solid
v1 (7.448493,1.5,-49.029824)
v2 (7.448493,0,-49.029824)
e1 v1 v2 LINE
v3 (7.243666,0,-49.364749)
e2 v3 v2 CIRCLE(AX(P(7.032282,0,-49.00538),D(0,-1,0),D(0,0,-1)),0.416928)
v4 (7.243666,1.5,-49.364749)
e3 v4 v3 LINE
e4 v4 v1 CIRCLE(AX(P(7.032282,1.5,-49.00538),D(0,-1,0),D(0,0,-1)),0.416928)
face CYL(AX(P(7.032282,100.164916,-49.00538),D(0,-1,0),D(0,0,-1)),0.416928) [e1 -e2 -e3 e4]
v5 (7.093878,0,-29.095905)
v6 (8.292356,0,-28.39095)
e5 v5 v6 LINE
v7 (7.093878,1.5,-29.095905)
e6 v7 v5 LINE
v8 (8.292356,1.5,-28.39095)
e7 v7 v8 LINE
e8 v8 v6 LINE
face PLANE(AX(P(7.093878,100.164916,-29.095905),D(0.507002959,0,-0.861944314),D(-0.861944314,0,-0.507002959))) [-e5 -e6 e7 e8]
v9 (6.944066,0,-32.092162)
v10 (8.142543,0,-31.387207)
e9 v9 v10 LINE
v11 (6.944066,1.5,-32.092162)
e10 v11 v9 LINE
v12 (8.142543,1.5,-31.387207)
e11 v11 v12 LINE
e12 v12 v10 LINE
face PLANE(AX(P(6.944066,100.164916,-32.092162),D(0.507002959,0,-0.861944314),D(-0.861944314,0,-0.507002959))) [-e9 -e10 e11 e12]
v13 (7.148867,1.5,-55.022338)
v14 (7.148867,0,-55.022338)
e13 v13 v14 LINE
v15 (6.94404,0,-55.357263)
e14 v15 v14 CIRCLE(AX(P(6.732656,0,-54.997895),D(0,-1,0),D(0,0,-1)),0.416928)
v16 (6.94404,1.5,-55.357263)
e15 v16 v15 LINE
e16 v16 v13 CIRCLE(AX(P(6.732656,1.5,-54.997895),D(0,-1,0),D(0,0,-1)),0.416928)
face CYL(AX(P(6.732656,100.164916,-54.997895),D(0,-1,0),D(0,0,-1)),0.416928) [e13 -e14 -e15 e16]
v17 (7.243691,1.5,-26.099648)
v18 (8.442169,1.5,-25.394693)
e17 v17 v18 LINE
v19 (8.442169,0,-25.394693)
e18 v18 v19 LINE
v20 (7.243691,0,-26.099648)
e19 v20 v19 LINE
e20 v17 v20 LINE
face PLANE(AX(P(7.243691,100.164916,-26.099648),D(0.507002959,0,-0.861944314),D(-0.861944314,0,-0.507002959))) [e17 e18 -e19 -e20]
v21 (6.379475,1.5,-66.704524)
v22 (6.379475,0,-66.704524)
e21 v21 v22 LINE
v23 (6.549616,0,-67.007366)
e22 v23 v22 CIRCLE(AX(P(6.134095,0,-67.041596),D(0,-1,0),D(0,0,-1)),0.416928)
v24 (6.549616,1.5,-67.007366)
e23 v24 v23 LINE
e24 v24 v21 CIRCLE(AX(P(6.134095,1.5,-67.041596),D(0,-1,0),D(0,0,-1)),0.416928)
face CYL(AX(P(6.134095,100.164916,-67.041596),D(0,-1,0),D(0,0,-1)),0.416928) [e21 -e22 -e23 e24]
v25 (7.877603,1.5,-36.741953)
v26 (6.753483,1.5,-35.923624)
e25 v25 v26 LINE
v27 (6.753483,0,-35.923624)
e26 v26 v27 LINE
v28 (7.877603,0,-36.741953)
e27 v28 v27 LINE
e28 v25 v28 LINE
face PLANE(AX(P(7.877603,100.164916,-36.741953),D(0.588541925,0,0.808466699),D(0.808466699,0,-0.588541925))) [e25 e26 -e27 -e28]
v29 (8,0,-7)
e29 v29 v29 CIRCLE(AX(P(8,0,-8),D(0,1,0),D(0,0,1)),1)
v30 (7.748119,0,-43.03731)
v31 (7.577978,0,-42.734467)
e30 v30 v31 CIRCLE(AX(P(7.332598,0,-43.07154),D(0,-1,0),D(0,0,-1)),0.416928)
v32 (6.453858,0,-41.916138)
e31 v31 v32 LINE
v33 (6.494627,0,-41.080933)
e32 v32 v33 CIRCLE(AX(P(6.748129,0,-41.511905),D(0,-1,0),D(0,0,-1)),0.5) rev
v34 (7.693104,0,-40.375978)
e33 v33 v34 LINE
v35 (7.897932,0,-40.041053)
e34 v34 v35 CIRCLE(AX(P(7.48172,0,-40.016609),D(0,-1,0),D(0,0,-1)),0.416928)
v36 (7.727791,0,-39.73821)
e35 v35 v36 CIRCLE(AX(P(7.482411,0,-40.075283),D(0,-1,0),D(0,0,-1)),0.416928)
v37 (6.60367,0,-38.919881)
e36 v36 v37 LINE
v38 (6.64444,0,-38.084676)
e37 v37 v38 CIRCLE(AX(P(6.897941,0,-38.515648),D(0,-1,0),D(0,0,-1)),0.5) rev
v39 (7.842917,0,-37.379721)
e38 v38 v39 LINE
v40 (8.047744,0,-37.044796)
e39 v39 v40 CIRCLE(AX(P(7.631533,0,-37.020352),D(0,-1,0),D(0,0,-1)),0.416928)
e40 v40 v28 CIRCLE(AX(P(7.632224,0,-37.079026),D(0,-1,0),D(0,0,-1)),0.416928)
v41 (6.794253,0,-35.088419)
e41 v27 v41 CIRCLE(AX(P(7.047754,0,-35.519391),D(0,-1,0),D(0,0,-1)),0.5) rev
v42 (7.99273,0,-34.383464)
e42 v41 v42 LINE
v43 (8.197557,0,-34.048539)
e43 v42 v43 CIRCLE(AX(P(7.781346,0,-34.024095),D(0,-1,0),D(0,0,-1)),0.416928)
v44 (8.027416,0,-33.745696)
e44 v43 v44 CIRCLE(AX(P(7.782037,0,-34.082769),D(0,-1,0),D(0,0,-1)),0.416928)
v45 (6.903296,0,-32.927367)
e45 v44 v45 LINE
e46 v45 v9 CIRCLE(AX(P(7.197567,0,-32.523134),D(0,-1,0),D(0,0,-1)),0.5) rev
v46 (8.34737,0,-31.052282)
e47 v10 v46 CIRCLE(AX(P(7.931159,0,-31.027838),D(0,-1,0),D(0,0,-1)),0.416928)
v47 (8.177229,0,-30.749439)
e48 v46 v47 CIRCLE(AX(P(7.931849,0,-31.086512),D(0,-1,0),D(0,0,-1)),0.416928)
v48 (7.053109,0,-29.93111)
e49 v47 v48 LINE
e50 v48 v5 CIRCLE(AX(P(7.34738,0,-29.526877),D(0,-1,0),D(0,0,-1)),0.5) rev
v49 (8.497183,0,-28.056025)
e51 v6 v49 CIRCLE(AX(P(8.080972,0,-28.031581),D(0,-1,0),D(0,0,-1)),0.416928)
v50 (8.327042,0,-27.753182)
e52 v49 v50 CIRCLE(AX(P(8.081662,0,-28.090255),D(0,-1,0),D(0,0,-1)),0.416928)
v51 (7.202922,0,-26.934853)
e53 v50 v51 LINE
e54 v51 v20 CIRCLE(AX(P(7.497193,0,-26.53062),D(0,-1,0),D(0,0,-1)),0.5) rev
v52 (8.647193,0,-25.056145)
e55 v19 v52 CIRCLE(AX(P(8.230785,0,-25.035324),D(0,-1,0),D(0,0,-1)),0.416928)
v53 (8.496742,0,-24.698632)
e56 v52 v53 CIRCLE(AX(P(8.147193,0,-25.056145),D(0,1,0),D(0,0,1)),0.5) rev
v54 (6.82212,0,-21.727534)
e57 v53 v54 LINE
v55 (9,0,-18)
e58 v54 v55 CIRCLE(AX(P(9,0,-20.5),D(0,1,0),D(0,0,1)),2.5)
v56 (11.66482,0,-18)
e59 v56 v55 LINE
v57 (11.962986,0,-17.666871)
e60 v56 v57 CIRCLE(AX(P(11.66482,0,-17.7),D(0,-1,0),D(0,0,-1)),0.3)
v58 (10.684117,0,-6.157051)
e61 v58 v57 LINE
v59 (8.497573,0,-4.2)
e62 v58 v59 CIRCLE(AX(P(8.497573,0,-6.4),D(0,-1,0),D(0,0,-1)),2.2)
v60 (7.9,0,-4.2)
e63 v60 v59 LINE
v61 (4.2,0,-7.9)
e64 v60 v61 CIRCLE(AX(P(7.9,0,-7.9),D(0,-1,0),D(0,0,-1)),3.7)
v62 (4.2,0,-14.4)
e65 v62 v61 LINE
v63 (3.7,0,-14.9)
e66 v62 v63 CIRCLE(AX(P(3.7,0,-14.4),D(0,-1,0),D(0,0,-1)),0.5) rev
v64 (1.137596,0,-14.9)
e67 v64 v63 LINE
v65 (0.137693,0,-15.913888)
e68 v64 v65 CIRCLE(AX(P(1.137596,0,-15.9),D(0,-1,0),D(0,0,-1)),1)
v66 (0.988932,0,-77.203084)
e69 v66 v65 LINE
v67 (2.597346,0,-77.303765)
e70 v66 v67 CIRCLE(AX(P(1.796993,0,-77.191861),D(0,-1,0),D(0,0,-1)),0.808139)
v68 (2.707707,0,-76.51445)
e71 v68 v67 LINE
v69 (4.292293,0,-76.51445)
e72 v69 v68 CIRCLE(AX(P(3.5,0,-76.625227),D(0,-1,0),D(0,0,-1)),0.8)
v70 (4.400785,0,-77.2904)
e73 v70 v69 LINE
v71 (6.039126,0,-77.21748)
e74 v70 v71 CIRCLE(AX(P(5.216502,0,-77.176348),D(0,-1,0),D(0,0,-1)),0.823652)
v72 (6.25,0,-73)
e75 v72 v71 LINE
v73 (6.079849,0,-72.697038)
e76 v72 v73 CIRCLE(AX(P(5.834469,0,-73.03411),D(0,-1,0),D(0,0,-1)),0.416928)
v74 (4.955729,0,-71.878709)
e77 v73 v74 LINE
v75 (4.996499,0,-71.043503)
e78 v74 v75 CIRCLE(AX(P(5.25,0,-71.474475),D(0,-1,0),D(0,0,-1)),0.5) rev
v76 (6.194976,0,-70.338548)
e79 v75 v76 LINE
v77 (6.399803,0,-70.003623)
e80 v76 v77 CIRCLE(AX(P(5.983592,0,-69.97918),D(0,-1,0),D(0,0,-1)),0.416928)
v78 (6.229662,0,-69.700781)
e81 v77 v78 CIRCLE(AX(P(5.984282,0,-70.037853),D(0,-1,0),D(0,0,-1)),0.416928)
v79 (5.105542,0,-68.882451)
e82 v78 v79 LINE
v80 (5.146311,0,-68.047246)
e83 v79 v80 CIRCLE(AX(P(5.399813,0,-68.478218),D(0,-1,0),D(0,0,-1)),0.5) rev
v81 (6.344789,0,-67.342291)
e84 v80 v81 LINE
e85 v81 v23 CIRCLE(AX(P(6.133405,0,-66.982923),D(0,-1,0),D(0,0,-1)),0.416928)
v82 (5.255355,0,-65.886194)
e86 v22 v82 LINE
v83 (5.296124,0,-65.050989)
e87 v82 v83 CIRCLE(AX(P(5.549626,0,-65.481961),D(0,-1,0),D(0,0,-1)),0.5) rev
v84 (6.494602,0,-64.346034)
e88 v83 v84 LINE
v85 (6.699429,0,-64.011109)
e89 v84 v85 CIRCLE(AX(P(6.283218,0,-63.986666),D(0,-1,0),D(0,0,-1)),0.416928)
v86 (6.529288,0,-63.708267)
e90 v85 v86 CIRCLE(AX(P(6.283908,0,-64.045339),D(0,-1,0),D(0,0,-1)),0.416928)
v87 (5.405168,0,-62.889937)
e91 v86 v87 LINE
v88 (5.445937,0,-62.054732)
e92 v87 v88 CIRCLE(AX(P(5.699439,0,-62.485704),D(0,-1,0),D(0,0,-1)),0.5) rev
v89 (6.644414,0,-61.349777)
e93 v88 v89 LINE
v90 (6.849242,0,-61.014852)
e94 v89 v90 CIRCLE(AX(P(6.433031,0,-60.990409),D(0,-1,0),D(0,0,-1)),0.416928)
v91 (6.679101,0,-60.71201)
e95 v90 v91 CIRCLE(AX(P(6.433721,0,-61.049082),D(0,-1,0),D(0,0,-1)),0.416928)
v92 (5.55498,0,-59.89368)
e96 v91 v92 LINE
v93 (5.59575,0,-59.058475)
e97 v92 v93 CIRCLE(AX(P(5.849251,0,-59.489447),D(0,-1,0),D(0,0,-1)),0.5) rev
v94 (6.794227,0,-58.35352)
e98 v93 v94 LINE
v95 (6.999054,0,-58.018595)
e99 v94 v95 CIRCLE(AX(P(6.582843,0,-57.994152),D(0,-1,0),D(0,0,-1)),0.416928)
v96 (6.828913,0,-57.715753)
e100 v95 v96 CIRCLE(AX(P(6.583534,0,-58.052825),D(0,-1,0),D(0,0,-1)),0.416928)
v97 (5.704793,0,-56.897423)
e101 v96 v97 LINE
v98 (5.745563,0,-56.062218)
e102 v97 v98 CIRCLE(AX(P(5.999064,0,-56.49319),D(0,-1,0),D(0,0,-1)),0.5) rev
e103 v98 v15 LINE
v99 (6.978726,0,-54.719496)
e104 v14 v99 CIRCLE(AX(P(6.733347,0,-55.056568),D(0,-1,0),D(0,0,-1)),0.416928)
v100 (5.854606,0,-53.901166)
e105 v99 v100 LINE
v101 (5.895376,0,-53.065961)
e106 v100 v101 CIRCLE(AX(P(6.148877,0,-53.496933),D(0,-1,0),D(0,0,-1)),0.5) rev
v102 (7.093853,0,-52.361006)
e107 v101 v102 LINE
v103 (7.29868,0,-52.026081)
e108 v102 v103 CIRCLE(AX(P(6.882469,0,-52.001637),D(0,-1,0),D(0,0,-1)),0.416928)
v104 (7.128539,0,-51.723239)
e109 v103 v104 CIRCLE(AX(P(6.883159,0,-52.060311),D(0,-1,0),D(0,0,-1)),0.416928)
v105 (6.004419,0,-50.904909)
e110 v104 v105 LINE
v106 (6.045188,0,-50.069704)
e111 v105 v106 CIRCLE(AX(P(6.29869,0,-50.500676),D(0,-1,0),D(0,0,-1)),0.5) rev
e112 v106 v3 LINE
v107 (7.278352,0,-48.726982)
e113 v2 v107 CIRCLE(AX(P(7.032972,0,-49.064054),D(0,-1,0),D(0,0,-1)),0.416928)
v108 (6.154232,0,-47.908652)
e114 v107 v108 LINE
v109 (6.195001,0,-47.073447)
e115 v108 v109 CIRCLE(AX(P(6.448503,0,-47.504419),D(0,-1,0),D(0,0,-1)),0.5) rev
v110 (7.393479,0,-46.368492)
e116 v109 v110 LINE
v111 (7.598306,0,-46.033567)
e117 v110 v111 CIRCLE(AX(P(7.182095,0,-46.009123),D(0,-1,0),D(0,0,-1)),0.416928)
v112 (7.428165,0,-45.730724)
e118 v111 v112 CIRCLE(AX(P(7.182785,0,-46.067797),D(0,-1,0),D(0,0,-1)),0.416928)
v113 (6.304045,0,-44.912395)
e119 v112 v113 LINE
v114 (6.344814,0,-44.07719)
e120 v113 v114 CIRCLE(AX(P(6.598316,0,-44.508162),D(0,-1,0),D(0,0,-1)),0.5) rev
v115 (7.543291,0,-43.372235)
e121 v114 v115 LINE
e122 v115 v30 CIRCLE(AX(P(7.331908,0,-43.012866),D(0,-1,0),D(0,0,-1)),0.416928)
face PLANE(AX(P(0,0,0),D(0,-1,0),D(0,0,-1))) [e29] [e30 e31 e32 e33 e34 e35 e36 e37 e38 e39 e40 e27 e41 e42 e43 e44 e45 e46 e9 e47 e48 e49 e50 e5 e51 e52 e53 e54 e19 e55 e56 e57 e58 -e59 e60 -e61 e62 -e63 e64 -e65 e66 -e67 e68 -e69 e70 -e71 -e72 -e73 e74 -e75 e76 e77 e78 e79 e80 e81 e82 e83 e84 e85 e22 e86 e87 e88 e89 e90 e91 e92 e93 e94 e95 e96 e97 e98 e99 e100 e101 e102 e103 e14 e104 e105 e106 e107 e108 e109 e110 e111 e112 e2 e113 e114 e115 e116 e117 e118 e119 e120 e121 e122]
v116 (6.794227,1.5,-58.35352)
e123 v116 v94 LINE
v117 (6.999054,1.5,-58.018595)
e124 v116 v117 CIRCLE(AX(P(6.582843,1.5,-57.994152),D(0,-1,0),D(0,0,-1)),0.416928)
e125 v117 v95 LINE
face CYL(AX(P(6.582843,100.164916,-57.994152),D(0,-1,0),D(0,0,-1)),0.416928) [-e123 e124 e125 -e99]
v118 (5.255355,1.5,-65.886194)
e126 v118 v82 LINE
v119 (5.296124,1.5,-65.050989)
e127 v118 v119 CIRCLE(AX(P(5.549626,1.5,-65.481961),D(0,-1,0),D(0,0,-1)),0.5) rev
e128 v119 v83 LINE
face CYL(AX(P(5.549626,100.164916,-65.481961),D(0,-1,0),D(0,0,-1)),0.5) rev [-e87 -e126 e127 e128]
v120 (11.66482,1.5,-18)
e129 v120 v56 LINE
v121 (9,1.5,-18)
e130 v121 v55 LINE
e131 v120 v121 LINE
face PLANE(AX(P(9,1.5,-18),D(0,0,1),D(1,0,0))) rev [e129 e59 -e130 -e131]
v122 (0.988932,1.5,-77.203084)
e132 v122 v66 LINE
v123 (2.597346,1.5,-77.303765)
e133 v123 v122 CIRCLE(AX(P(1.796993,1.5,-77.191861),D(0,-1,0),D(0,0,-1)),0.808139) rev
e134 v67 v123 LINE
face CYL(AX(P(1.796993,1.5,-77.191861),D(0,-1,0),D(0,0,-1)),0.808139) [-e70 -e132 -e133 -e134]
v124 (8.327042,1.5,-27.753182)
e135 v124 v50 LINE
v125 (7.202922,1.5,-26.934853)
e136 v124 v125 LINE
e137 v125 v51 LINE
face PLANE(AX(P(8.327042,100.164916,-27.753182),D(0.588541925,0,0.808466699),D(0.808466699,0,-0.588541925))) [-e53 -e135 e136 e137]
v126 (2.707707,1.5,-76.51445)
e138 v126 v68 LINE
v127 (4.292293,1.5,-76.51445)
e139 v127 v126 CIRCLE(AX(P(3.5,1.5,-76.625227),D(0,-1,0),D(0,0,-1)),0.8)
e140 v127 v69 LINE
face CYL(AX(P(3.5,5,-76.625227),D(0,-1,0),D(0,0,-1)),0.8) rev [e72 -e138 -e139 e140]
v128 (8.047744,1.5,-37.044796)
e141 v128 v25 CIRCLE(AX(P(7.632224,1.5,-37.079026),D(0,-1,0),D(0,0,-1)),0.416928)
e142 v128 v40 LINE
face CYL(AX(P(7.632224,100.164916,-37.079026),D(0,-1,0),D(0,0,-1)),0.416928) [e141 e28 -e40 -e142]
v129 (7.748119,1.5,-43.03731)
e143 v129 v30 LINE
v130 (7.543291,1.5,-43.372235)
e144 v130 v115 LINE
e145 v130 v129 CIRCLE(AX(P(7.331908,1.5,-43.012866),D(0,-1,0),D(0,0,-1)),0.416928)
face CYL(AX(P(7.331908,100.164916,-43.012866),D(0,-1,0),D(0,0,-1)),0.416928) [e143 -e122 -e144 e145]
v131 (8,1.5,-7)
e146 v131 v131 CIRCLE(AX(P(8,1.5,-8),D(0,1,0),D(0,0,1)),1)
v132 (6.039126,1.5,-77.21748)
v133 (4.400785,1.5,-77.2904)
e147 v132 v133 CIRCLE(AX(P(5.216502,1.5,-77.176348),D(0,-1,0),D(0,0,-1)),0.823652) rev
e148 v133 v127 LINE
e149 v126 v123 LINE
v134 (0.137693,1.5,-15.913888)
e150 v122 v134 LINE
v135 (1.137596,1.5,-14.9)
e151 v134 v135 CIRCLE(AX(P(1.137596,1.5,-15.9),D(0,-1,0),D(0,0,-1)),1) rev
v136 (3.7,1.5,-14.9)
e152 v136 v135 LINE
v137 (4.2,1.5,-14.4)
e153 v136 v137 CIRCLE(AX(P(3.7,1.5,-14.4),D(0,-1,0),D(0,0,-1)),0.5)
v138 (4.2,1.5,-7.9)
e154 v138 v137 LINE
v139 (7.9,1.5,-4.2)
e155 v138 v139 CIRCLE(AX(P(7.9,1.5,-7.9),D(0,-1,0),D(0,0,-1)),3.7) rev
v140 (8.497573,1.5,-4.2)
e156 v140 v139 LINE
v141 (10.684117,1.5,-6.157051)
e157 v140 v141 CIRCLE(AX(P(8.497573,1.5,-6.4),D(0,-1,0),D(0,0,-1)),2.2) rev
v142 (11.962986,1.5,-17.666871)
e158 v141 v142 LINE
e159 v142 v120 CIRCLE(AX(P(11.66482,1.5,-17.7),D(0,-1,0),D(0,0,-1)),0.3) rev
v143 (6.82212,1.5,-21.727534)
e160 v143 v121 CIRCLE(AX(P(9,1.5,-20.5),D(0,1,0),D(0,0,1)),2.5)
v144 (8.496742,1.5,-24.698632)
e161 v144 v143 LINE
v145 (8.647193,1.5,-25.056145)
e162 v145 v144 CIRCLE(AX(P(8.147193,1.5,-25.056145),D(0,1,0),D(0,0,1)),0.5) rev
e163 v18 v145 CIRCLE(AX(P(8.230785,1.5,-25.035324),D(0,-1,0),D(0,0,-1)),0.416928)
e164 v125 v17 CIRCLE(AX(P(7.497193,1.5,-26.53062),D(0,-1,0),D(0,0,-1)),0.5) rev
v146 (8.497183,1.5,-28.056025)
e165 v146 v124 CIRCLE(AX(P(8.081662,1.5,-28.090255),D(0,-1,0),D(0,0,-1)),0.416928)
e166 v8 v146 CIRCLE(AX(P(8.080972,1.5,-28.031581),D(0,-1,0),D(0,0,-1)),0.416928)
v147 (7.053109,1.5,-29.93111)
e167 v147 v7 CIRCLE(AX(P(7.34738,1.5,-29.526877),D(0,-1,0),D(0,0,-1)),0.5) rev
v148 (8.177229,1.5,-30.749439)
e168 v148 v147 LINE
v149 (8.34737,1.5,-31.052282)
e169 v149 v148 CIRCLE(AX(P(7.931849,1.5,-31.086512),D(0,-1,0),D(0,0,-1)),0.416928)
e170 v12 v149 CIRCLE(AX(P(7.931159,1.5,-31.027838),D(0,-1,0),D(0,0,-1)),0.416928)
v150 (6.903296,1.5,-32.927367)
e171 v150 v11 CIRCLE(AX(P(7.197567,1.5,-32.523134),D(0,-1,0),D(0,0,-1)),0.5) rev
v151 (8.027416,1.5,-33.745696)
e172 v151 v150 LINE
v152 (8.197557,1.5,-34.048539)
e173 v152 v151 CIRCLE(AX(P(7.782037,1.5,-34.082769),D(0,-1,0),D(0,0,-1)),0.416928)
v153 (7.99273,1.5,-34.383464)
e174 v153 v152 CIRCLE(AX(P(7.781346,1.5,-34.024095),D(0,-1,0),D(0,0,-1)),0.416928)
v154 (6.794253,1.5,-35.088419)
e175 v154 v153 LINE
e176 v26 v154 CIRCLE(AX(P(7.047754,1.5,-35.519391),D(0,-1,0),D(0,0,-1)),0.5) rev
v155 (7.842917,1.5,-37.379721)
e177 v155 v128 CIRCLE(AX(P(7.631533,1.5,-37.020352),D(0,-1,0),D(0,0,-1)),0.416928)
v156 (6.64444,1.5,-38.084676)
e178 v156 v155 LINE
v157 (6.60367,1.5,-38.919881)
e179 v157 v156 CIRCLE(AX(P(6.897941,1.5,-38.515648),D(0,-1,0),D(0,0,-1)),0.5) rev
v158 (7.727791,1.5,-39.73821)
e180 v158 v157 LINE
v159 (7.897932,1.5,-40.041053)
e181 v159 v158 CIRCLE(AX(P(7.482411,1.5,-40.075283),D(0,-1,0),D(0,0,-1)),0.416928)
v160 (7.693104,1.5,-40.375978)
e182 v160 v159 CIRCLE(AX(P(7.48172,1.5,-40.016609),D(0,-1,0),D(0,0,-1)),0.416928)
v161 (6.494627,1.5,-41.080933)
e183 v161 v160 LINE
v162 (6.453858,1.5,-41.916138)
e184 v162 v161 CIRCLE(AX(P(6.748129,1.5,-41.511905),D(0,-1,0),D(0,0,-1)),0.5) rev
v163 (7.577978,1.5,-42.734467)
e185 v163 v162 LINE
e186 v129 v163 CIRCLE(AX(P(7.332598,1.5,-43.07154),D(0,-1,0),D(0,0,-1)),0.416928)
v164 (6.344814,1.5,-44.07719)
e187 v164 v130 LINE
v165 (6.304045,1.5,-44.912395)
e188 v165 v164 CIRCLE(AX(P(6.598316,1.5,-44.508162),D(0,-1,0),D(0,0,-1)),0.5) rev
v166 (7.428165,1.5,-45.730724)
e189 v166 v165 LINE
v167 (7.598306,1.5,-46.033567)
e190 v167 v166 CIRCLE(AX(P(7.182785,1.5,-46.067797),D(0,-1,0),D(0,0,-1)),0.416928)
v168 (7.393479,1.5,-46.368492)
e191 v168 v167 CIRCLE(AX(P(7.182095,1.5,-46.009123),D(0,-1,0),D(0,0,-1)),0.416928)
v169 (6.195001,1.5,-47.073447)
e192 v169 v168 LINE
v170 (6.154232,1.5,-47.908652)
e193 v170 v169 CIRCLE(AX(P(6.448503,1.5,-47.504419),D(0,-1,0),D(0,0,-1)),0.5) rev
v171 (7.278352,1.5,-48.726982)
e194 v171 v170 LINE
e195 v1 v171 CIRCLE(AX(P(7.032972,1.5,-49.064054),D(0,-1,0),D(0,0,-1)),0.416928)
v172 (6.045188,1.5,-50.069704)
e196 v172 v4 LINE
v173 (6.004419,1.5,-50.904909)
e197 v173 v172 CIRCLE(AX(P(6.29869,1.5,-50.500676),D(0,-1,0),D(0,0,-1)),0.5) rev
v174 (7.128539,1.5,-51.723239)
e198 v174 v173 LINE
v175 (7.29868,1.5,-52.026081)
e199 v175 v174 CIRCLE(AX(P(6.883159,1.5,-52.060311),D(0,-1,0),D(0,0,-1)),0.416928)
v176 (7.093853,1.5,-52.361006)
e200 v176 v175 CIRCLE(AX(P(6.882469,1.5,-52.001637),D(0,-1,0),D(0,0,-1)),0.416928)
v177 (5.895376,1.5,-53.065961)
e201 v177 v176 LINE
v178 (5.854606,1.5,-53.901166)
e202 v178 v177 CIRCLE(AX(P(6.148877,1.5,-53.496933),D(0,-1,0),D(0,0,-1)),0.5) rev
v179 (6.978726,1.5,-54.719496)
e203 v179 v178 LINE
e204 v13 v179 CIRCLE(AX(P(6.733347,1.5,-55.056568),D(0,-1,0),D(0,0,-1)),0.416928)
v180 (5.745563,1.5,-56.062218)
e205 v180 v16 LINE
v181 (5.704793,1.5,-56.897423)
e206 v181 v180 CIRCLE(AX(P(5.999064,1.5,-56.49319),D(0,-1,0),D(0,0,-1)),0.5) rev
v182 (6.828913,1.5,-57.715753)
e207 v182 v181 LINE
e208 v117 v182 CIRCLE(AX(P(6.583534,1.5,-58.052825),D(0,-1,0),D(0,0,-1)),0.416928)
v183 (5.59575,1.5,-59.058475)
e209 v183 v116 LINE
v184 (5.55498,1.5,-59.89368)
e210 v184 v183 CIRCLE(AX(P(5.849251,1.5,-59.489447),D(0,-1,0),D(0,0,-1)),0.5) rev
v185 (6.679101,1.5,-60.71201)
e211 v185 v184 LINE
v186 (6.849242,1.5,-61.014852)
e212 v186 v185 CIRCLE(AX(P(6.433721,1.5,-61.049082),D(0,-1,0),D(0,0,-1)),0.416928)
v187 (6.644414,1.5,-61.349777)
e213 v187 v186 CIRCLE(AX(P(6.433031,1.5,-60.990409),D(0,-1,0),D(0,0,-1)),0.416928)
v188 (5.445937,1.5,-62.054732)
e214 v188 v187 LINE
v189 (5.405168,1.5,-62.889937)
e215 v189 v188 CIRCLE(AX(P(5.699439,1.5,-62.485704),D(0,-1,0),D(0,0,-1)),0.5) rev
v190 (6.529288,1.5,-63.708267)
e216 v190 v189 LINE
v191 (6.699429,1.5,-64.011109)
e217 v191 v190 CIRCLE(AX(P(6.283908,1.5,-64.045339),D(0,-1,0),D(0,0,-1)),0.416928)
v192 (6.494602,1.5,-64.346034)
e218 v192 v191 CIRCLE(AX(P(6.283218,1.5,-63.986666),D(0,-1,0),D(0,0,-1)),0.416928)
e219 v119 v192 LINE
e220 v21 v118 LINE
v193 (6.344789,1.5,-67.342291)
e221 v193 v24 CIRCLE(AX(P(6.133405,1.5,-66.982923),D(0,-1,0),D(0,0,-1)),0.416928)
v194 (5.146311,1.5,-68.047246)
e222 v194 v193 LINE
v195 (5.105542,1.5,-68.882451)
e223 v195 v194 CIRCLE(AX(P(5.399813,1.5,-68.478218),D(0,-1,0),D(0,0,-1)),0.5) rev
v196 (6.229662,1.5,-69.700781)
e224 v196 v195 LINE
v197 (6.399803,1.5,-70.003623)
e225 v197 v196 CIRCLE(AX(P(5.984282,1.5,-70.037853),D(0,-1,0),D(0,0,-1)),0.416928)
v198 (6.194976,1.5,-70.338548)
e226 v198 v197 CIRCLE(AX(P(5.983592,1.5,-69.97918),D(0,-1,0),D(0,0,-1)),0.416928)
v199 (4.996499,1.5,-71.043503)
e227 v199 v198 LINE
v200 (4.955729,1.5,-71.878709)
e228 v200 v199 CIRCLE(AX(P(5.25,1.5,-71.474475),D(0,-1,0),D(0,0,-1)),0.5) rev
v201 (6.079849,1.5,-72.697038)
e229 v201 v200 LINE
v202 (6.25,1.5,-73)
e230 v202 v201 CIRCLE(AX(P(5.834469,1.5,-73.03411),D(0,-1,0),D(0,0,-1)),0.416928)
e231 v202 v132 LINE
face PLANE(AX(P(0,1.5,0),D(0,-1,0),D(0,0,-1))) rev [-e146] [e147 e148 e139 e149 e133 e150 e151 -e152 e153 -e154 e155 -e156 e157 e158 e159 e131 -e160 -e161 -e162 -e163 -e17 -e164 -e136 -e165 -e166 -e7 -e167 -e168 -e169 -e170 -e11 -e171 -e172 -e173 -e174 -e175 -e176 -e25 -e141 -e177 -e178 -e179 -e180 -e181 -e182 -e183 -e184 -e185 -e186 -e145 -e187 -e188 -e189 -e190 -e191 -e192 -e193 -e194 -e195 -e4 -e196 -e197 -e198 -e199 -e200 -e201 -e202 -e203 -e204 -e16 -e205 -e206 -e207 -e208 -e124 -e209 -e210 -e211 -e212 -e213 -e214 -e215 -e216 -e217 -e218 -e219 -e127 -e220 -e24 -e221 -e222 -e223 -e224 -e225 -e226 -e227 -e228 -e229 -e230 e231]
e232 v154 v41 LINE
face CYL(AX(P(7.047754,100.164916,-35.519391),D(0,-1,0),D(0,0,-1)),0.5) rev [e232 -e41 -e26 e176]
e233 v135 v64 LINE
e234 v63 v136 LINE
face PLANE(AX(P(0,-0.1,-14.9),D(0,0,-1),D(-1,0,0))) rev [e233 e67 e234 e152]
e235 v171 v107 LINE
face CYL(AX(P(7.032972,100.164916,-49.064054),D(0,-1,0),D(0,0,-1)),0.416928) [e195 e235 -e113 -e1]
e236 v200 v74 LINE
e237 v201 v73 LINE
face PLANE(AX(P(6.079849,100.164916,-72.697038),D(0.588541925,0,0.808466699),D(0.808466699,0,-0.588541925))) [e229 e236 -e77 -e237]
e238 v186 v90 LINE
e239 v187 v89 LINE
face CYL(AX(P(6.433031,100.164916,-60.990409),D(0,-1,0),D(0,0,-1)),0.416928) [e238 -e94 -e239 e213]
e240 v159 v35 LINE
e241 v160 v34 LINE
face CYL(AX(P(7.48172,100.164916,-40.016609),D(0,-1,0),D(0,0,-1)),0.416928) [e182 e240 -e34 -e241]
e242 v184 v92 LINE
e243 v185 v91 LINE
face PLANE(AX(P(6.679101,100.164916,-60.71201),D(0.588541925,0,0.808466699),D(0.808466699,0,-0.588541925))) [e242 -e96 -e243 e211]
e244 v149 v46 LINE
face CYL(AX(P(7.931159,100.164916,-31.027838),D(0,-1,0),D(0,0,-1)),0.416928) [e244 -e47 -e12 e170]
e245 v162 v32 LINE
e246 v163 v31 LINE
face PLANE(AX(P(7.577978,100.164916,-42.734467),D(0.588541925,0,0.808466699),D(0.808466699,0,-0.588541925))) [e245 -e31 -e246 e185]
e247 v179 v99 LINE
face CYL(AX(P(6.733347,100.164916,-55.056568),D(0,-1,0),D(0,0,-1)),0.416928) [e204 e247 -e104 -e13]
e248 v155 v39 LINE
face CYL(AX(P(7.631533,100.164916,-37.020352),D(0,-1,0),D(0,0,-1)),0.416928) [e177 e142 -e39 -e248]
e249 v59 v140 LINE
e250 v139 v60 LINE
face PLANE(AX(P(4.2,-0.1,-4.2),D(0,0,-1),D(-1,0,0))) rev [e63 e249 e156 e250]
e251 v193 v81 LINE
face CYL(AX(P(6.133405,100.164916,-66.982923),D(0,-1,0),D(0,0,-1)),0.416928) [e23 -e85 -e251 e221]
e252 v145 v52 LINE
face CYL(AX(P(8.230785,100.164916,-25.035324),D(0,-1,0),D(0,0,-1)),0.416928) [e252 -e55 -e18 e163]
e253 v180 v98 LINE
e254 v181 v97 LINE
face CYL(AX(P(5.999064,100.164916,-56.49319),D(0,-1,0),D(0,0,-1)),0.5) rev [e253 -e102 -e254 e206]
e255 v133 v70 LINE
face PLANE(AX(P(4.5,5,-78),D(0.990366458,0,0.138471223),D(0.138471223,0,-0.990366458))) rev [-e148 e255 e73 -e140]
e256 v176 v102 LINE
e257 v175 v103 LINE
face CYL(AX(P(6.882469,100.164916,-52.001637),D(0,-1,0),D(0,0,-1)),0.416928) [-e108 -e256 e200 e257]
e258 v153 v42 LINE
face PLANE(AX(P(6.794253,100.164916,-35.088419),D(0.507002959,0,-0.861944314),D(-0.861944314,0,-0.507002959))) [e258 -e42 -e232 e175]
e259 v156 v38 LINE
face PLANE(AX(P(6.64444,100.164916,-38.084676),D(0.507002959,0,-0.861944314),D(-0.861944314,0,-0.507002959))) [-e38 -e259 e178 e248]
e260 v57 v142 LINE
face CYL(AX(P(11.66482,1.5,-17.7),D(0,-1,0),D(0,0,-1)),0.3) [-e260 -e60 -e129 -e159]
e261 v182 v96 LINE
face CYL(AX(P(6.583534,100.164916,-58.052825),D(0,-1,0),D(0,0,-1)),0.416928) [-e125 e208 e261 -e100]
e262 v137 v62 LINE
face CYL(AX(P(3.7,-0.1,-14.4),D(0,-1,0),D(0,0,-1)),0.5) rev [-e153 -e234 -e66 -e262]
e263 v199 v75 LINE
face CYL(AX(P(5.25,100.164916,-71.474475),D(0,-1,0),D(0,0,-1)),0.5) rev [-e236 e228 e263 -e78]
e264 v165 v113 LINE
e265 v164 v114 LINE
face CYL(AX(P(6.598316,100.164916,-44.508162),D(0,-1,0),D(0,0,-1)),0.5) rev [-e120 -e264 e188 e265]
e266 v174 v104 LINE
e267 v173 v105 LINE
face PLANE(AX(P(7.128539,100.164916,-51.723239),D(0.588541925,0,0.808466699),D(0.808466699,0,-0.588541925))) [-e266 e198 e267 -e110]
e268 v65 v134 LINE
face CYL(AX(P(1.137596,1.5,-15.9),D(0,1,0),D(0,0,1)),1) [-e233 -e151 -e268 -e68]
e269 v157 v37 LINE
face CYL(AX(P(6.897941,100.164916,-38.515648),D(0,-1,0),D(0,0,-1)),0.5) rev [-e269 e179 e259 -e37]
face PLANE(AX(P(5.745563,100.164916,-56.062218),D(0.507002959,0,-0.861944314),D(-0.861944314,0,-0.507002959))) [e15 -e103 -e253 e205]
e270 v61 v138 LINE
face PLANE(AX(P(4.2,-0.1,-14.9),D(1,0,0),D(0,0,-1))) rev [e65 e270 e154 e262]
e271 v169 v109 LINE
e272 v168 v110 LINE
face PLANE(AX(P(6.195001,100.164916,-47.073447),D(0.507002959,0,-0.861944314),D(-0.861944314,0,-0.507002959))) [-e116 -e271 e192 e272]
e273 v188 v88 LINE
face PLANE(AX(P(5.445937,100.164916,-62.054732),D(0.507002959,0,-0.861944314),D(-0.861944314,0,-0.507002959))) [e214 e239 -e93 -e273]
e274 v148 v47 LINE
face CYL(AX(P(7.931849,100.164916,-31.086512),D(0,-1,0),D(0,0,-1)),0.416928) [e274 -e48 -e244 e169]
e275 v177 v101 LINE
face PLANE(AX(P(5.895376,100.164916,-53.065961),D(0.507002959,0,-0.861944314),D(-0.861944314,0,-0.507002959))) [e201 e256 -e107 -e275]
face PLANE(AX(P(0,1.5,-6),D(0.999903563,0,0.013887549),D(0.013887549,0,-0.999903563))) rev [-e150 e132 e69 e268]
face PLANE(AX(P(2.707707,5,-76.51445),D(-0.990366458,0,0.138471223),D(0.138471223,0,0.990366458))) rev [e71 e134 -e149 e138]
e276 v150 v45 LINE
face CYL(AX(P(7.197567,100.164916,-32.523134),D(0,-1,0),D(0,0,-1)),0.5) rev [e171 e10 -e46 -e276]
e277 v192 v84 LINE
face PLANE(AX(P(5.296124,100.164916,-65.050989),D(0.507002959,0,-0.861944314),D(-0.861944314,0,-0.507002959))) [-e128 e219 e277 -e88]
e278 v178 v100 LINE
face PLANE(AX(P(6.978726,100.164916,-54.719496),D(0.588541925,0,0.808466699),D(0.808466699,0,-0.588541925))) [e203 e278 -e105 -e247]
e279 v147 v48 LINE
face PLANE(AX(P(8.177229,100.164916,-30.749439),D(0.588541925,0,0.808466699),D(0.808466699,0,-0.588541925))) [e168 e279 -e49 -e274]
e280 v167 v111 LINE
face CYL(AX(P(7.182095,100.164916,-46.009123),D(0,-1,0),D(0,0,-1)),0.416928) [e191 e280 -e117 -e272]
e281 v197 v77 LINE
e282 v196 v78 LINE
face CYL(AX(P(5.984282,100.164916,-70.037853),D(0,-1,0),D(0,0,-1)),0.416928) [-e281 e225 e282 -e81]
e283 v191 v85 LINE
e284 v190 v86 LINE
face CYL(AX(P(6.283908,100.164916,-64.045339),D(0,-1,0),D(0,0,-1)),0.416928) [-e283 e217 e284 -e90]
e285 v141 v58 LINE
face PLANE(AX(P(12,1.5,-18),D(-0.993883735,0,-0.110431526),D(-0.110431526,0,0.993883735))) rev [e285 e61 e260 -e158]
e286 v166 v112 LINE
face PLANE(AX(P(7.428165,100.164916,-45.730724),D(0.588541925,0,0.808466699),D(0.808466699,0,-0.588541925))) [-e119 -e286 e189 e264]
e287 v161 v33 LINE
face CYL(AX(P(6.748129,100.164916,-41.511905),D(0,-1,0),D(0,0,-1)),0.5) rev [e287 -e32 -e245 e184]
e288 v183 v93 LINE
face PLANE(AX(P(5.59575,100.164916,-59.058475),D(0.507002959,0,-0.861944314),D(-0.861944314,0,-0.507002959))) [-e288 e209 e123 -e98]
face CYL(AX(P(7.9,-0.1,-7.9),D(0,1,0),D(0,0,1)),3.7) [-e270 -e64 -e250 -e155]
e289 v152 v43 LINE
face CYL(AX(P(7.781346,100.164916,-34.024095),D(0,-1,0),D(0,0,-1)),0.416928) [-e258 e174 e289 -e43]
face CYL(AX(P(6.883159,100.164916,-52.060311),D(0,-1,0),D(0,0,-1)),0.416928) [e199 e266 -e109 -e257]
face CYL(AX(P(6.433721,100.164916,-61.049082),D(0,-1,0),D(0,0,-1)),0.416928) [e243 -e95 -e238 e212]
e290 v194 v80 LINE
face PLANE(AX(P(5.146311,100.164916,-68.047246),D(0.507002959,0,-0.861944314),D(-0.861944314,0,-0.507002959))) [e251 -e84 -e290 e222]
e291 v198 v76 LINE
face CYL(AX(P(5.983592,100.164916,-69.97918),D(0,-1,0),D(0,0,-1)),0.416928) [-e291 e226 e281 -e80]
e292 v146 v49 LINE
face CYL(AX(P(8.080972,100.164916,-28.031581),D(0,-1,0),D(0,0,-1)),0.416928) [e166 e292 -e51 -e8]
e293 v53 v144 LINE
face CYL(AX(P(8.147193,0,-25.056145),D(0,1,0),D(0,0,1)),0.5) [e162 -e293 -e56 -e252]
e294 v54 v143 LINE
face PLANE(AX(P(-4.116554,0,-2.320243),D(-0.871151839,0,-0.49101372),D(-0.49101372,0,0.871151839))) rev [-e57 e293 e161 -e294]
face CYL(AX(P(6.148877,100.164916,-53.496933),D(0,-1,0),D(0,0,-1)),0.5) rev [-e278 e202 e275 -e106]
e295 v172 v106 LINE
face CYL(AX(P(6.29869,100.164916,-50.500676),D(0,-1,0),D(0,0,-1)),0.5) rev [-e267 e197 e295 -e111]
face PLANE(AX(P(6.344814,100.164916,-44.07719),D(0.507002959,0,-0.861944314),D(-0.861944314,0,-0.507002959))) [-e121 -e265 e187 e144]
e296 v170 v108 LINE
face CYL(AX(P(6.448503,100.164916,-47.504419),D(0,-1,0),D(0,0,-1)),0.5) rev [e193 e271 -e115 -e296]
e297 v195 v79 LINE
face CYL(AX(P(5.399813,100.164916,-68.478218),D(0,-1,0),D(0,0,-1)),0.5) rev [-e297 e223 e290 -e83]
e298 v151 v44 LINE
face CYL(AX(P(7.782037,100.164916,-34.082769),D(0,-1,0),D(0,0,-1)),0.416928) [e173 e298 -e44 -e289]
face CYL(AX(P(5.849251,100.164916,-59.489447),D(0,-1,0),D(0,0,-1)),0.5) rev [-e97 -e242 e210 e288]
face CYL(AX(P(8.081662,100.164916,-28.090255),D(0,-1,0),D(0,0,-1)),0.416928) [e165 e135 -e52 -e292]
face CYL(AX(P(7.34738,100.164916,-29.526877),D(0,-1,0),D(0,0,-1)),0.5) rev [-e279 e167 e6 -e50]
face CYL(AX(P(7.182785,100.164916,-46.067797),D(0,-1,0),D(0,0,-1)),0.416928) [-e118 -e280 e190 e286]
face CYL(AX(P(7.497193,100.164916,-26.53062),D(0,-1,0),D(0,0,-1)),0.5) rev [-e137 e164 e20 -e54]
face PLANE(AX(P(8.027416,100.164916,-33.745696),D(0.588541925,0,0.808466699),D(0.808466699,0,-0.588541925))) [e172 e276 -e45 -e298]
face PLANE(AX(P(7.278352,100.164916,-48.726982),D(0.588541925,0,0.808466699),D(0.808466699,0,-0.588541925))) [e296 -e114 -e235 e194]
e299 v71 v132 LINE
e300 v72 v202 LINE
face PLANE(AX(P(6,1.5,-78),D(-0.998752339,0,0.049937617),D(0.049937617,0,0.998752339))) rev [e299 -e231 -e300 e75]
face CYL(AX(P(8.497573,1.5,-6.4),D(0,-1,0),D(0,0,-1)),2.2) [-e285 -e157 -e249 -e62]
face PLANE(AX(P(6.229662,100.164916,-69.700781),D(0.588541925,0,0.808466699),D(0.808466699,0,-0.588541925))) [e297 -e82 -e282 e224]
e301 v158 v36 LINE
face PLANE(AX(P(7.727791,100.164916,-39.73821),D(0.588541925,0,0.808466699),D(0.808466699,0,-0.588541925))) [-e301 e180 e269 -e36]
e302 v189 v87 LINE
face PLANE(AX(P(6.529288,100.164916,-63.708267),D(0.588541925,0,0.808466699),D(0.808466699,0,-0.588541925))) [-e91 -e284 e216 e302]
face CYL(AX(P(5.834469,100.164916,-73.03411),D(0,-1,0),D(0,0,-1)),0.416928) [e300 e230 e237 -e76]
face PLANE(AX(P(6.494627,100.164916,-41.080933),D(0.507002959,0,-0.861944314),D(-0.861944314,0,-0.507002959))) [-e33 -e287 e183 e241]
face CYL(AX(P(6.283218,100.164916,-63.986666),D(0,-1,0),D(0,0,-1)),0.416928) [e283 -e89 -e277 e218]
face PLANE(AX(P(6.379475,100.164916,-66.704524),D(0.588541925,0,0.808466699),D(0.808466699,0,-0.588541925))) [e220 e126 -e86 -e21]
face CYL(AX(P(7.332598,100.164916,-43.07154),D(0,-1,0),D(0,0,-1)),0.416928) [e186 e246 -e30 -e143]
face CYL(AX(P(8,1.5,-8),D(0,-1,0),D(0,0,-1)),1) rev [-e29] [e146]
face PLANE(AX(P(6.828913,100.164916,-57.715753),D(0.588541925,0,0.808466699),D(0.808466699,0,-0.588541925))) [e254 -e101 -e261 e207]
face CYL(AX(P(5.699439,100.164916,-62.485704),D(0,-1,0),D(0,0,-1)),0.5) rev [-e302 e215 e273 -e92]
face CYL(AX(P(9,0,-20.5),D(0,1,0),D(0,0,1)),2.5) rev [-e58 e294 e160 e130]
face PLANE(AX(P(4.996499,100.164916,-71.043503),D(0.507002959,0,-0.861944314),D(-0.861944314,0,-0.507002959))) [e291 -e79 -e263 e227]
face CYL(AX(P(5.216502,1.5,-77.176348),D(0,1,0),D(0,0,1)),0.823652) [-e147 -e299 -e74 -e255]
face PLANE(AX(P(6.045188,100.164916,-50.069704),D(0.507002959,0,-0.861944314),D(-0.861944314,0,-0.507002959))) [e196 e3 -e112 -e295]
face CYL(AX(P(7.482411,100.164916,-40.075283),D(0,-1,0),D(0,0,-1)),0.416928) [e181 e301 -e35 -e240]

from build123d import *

# Parameters (mm, degrees)
SKETCH1_R           = 1
BOSS_EXTRUDE1_DEPTH = 1.5
FILLET1_R           = 3
CUT_EXTRUDE1_DEPTH  = 79.931932702
LPATTERN1_COUNT     = 16
LPATTERN1_PITCH     = 3
CUT_EXTRUDE2_DEPTH  = 79.931932702
FILLET2_R           = 0.3
CUT_EXTRUDE3_DEPTH  = 5
FILLET3_R           = 0.808139
FILLET4_R           = 0.823652
CUT_EXTRUDE4_DEPTH  = 1.6
FILLET10_R          = 1
FILLET11_R          = 0.5
FILLET13_R          = 3.7
FILLET14_R          = 2.2


with BuildPart() as part:
    # Sketch1 → Boss-Extrude1 (new body)
    with BuildSketch(Plane(origin=(0, 0, 0), x_dir=(1, 0, 0), z_dir=(0, 1, 0))):
        Polygon((0, 0), (0, 6), (1, 78), (6, 78), (9, 18), (12, 18), (10, 0), align=None)
        with Locations(Location((8, 8, 0), (0, 0, 270))):
            Circle(SKETCH1_R, mode=Mode.SUBTRACT)
    extrude(amount=BOSS_EXTRUDE1_DEPTH)

    # Fillet1
    fillet1_edges = [part.edges().sort_by_distance(p)[0] for p in [
        (10, 0.75, 0),
    ]]
    fillet(fillet1_edges, radius=FILLET1_R)

    # Sketch2 → Cut-Extrude1 (cut, symmetric)
    with BuildSketch(Plane(origin=(0, 1.5, 0), x_dir=(1, 0, 0), z_dir=(0, 1, 0))):
        with BuildLine():
            ThreePointArc((4.955729038, 71.878708516), (4.750594632, 71.450097336), (4.996498521, 71.04350301))
            Line((4.996498521, 71.04350301), (6.194975811, 70.338548499))
            ThreePointArc((6.194975811, 70.338548499), (6.340221232, 70.195153453), (6.4, 70))
            Line((6.4, 70), (6.25, 73))
            ThreePointArc((6.25, 73), (6.19798995, 72.829948537), (6.079849196, 72.697037636))
            Line((6.079849196, 72.697037636), (4.955729038, 71.878708516))
        make_face()
    cut_extrude1 = extrude(amount=CUT_EXTRUDE1_DEPTH, both=True, mode=Mode.SUBTRACT)

    # LPattern1: Cut-Extrude1 ×16
    with Locations(*[Vector(0.0499376169438922, 0, 0.9987523388778448) * (i * LPATTERN1_PITCH) for i in range(1, LPATTERN1_COUNT)]):
        add(cut_extrude1, mode=Mode.SUBTRACT)

    # Sketch3 → Cut-Extrude2 (cut, through all)
    with BuildSketch(Plane(origin=(0, 1.5, 0), x_dir=(1, 0, 0), z_dir=(0, 1, 0))):
        with BuildLine():
            Line((8.496742185, 24.698632232), (6.822120402, 21.727534299))
            ThreePointArc((6.822120402, 21.727534299), (6.841431522, 19.238817172), (9, 18))
            Line((9, 18), (8.647192762, 25.05614475))
            ThreePointArc((8.647192762, 25.05614475), (8.608047789, 24.862204955), (8.496742185, 24.698632232))
        make_face()
    extrude(amount=-CUT_EXTRUDE2_DEPTH, mode=Mode.SUBTRACT)

    # Fillet2
    fillet2_edges = [part.edges().sort_by_distance(p)[0] for p in [
        (12, 0.75, -18),
    ]]
    fillet(fillet2_edges, radius=FILLET2_R)

    # Sketch16 → Cut-Extrude3 (cut)
    with BuildSketch(Plane.XZ):
        with BuildLine():
            Line((6, -78), (4.5, -78))
            Line((4.5, -78), (4.292293166, -76.514450313))
            ThreePointArc((4.292293166, -76.514450313), (3.5, -75.825227292), (2.707706834, -76.514450313))
            Line((2.707706834, -76.514450313), (2.5, -78))
            Line((2.5, -78), (1, -78))
            Line((1, -78), (1, -78.416520576))
            Line((1, -78.416520576), (6, -78.416520576))
            Line((6, -78.416520576), (6, -78))
        make_face()
    extrude(amount=-CUT_EXTRUDE3_DEPTH, mode=Mode.SUBTRACT)

    # Fillet3
    fillet3_edges = [part.edges().sort_by_distance(p)[0] for p in [
        (1, 0.75, -78),
        (2.5, 0.75, -78),
    ]]
    fillet(fillet3_edges, radius=FILLET3_R - 0.0001)  # a hair under: the kernel refuses the full size

    # Fillet4
    fillet4_edges = [part.edges().sort_by_distance(p)[0] for p in [
        (6, 0.75, -78),
        (4.5, 0.75, -78),
    ]]
    fillet(fillet4_edges, radius=FILLET4_R - 0.0001)  # a hair under: the kernel refuses the full size

    # Sketch15 → Cut-Extrude4 (cut)
    with BuildSketch(Plane(origin=(0, 1.5, 0), x_dir=(1, 0, 0), z_dir=(0, 1, 0))):
        Polygon((4.2, 14.9), (4.2, 4.2), (11.363579638, 4.2), (10.97286707, 0), (4.2, 0), (0, 0), (0, 14.9), align=None)
    extrude(amount=-CUT_EXTRUDE4_DEPTH, mode=Mode.SUBTRACT)

    # Fillet10
    fillet10_edges = [part.edges().sort_by_distance(p)[0] for p in [
        (0.123611111, 0.75, -14.9),
    ]]
    fillet(fillet10_edges, radius=FILLET10_R)

    # Fillet11
    fillet11_edges = [part.edges().sort_by_distance(p)[0] for p in [
        (4.2, 0.75, -14.9),
    ]]
    fillet(fillet11_edges, radius=FILLET11_R)

    # Fillet13
    fillet13_edges = [part.edges().sort_by_distance(p)[0] for p in [
        (4.2, 0.75, -4.2),
    ]]
    fillet(fillet13_edges, radius=FILLET13_R)

    # Fillet14
    fillet14_edges = [part.edges().sort_by_distance(p)[0] for p in [
        (10.466666667, 0.75, -4.2),
    ]]
    fillet(fillet14_edges, radius=FILLET14_R)


solid = part.part
